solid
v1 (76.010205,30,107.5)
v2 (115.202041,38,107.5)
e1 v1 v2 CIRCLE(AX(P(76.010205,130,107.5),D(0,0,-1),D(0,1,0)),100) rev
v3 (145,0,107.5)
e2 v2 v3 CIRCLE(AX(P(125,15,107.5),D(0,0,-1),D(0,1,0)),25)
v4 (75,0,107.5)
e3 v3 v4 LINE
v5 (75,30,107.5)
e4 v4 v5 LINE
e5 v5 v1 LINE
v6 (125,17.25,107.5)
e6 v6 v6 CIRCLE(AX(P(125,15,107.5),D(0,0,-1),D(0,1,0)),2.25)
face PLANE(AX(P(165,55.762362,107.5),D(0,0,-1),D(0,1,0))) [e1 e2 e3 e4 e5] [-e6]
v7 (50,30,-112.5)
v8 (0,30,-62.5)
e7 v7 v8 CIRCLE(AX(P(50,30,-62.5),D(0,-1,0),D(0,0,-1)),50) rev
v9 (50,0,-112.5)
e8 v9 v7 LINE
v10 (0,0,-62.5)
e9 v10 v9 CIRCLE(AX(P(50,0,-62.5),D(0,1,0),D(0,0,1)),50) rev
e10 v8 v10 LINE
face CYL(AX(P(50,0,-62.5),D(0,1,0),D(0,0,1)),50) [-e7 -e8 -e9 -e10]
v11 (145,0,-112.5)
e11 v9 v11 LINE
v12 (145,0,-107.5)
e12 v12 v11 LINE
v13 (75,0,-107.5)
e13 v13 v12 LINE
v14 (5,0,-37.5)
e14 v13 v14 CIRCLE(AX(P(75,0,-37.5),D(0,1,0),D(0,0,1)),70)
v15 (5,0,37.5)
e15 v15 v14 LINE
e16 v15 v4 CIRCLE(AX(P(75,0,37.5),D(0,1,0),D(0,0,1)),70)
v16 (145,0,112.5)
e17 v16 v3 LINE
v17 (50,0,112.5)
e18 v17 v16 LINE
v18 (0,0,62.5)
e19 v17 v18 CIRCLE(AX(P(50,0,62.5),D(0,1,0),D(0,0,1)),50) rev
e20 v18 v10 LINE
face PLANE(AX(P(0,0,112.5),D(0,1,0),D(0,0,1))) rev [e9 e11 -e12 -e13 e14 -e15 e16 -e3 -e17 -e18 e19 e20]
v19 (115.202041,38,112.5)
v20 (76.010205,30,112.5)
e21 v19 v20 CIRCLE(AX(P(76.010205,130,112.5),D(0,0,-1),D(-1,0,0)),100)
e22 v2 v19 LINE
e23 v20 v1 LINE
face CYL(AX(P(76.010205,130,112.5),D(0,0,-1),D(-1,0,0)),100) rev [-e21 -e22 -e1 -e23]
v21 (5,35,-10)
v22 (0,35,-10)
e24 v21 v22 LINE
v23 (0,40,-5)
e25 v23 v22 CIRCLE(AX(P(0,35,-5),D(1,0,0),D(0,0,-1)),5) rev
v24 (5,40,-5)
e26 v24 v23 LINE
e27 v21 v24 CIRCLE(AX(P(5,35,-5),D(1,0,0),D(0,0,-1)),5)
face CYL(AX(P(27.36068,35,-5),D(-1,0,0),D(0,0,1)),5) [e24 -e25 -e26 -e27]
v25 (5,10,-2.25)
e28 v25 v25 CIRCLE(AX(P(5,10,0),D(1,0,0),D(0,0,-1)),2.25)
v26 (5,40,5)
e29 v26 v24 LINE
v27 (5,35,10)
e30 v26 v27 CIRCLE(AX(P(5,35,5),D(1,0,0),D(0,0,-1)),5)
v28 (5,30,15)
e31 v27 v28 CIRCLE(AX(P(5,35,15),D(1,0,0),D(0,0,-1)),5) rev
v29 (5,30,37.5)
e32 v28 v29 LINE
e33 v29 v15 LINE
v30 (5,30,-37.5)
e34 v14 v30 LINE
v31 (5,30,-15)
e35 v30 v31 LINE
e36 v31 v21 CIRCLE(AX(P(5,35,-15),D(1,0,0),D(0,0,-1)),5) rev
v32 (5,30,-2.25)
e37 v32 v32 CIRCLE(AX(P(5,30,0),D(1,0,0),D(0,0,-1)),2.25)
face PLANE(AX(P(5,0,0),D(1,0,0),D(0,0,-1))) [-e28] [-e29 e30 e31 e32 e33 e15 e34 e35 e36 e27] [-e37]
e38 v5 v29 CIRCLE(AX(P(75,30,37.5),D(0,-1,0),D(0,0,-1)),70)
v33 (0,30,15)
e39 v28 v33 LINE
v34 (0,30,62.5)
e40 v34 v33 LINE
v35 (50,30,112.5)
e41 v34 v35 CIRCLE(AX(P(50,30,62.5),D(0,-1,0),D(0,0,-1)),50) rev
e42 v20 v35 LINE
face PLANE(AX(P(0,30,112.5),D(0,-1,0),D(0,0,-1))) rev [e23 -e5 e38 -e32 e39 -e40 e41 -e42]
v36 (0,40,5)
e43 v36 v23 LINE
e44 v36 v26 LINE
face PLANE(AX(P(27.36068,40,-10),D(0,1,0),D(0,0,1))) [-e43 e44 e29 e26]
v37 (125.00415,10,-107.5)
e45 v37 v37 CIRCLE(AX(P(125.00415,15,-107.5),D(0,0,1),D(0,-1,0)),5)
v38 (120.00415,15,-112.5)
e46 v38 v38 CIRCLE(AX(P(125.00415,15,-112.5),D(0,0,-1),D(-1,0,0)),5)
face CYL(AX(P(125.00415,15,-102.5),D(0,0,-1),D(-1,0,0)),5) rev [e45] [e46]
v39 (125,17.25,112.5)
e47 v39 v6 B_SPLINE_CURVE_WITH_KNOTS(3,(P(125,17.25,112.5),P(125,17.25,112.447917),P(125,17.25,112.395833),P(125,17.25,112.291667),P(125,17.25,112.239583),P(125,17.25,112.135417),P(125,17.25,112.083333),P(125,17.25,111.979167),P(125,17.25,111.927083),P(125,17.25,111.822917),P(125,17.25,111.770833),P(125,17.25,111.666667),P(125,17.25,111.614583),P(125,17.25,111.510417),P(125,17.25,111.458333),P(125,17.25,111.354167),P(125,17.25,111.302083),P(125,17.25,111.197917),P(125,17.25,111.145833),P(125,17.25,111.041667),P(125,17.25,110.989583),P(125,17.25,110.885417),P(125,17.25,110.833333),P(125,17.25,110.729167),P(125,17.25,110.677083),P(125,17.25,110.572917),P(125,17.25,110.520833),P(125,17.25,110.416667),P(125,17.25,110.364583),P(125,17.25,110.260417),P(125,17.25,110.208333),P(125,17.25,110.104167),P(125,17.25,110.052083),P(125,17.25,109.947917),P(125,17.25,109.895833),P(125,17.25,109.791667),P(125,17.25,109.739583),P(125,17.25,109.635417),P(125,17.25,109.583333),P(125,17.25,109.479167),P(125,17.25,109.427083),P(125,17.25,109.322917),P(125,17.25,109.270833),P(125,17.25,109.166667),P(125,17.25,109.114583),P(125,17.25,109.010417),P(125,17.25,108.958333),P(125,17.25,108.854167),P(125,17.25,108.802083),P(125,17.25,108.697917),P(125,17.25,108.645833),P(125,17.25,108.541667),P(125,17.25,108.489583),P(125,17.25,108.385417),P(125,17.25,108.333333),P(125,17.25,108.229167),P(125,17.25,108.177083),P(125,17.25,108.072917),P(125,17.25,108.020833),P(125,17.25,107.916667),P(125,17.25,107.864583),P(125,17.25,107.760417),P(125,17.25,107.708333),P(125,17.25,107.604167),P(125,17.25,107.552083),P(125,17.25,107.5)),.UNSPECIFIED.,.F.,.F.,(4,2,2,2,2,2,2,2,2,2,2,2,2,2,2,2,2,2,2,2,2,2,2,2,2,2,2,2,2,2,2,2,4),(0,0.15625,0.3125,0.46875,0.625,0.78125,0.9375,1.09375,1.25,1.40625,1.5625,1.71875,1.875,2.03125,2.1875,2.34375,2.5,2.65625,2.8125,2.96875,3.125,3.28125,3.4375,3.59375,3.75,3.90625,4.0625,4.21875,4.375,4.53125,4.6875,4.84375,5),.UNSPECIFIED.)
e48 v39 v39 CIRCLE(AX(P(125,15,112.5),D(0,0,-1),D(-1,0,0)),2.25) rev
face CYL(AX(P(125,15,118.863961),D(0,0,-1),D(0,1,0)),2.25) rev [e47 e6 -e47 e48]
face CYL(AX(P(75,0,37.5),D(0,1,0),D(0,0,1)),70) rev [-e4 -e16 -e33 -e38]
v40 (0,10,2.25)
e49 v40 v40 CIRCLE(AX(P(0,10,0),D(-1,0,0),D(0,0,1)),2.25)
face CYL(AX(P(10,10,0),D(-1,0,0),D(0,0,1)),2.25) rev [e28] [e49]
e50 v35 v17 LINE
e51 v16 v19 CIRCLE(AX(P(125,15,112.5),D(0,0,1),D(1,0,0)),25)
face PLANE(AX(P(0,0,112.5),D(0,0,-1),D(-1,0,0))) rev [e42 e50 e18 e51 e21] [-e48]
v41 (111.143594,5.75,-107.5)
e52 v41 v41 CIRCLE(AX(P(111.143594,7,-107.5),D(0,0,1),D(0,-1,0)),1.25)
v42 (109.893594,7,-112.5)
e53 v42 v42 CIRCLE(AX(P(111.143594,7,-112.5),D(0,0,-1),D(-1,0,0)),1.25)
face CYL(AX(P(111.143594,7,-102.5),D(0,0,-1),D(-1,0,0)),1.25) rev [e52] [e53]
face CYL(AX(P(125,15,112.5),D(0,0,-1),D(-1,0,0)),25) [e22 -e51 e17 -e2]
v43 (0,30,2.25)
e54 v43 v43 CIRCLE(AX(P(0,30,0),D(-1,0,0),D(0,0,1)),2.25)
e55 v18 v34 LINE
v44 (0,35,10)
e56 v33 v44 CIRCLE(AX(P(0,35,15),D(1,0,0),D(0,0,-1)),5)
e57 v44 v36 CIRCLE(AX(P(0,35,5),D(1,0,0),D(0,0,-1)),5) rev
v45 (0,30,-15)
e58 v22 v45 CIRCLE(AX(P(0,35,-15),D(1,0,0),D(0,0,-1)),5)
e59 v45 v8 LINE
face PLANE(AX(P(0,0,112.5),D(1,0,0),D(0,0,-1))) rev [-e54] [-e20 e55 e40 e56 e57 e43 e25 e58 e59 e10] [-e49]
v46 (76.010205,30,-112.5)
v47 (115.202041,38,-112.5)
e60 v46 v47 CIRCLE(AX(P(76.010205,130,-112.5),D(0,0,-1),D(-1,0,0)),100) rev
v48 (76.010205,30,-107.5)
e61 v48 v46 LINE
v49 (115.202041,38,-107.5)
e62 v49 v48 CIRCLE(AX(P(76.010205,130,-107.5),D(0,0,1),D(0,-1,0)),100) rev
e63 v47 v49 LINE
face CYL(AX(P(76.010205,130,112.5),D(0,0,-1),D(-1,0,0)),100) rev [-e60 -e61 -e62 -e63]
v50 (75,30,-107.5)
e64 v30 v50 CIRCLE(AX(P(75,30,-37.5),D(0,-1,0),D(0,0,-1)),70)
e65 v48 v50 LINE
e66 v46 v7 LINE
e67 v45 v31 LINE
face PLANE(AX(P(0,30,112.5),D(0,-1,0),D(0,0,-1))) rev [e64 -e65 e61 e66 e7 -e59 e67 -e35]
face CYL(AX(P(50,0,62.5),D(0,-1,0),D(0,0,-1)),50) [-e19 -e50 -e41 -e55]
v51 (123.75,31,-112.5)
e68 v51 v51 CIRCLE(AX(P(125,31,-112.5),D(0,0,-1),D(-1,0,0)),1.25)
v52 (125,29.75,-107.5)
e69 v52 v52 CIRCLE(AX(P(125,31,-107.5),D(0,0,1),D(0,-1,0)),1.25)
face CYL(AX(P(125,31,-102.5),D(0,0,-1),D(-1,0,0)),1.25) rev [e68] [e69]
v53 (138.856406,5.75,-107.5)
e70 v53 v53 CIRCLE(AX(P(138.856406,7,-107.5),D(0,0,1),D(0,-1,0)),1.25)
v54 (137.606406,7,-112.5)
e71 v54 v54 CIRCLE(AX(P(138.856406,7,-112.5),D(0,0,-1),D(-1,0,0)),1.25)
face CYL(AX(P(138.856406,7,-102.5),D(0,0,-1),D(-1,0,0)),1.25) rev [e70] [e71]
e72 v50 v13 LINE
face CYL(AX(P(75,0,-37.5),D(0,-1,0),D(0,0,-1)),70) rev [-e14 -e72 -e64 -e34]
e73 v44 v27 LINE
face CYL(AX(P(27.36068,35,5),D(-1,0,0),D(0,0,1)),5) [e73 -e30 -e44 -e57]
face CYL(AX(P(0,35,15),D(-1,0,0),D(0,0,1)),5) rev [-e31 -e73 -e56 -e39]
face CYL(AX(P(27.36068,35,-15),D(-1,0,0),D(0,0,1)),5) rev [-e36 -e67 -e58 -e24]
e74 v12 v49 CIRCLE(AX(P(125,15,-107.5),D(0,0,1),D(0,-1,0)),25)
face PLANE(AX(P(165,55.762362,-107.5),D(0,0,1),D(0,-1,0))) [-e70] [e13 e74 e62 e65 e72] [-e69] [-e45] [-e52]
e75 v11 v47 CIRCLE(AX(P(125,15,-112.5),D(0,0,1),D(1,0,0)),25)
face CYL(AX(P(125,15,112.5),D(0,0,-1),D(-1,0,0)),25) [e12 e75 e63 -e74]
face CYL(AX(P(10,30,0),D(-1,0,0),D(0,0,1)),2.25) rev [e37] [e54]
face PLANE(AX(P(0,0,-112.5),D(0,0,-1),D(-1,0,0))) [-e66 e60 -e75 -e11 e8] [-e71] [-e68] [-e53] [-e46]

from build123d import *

# Parameters (mm, degrees)
SKETCH1_W           = 125
SKETCH1_H           = 30
BOSS_EXTRUDE1_DEPTH = 112.5
BOSS_EXTRUDE2_DEPTH = 112.5
CUT_EXTRUDE2_START  = 5
SKETCH4_W           = 215
SKETCH4_H           = 59.703545047
CUT_EXTRUDE2_DEPTH  = 160
SKETCH5_R           = 1.25
SKETCH5_R_2         = 5
CUT_EXTRUDE3_DEPTH  = 10
FILLET1_R           = 100
FILLET2_R           = 70
FILLET3_R           = 50
SKETCH7_W           = 20
SKETCH7_H           = 10
BOSS_EXTRUDE3_DEPTH = 5
SKETCH6_R           = 2.25
CUT_EXTRUDE4_DEPTH  = 10
FILLET4_R           = 5
FILLET5_R           = 5
SKETCH8_R           = 2.25
CUT_EXTRUDE5_DEPTH  = 5


with BuildPart() as part:
    # Sketch1 → Boss-Extrude1 (new, symmetric)
    with BuildSketch(Plane.XY):
        with Locations((62.5, 15)):
            Rectangle(SKETCH1_W, SKETCH1_H)
    extrude(amount=BOSS_EXTRUDE1_DEPTH, both=True)

    # Sketch2 → Boss-Extrude2 (add, symmetric)
    with BuildSketch(Plane.XY):
        with BuildLine():
            Line((105, 0), (145, 0))
            ThreePointArc((145, 0), (125, 40), (105, 0))
        make_face()
    extrude(amount=BOSS_EXTRUDE2_DEPTH, both=True)

    # Sketch4 → Cut-Extrude2 (cut)
    with BuildSketch(Plane(origin=(0, 0, 0), x_dir=(0, 0, -1), z_dir=(1, 0, 0)).offset(CUT_EXTRUDE2_START)):
        with Locations((0, 25.910589708)):
            Rectangle(SKETCH4_W, SKETCH4_H)
    extrude(amount=CUT_EXTRUDE2_DEPTH, mode=Mode.SUBTRACT)

    # Sketch5 → Cut-Extrude3 (cut)
    with BuildSketch(Plane(origin=(0, 0, -112.5), x_dir=(-1, 0, 0), z_dir=(0, 0, -1))):
        with Locations((-138.856406461, 7)):
            Circle(SKETCH5_R)
        with Locations((-125, 31)):
            Circle(SKETCH5_R)
        with Locations((-111.143593539, 7)):
            Circle(SKETCH5_R)
        with Locations((-125.004149617, 15)):
            Circle(SKETCH5_R_2)
    extrude(amount=-CUT_EXTRUDE3_DEPTH, mode=Mode.SUBTRACT)

    # Fillet1
    fillet1_edges = [part.edges().sort_by_distance(p)[0] for p in [
        (105, 30, -110),
        (105, 30, 110),
    ]]
    fillet(fillet1_edges, radius=FILLET1_R)

    # Fillet2
    fillet2_edges = [part.edges().sort_by_distance(p)[0] for p in [
        (5, 15, 107.5),
        (5, 15, -107.5),
    ]]
    fillet(fillet2_edges, radius=FILLET2_R)

    # Fillet3
    fillet3_edges = [part.edges().sort_by_distance(p)[0] for p in [
        (0, 15, 112.5),
        (0, 15, -112.5),
    ]]
    fillet(fillet3_edges, radius=FILLET3_R)

    # Sketch7 → Boss-Extrude3 (add)
    with BuildSketch(Plane.ZY):
        with Locations((0, 35)):
            Rectangle(SKETCH7_W, SKETCH7_H)
    extrude(amount=-BOSS_EXTRUDE3_DEPTH)

    # Sketch6 → Cut-Extrude4 (cut)
    with BuildSketch(Plane.ZY):
        with Locations((0, 10)):
            Circle(SKETCH6_R)
        with Locations((0, 30)):
            Circle(SKETCH6_R)
    extrude(amount=-CUT_EXTRUDE4_DEPTH, mode=Mode.SUBTRACT)

    # Fillet4
    fillet4_edges = [part.edges().sort_by_distance(p)[0] for p in [
        (2.5, 30, 10),
        (2.5, 30, -10),
    ]]
    fillet(fillet4_edges, radius=FILLET4_R)

    # Fillet5
    fillet5_edges = [part.edges().sort_by_distance(p)[0] for p in [
        (2.5, 40, 10),
        (2.5, 40, -10),
    ]]
    fillet(fillet5_edges, radius=FILLET5_R - 0.0001)  # a hair under: the kernel refuses the full size

    # Sketch8 → Cut-Extrude5 (cut)
    with BuildSketch(Plane(origin=(0, 0, 107.5), x_dir=(-1, 0, 0), z_dir=(0, 0, -1))):
        with Locations(Location((-125, 15, 0), (0, 0, 90))):
            Circle(SKETCH8_R)
    extrude(amount=-CUT_EXTRUDE5_DEPTH, mode=Mode.SUBTRACT)


solid = part.part
